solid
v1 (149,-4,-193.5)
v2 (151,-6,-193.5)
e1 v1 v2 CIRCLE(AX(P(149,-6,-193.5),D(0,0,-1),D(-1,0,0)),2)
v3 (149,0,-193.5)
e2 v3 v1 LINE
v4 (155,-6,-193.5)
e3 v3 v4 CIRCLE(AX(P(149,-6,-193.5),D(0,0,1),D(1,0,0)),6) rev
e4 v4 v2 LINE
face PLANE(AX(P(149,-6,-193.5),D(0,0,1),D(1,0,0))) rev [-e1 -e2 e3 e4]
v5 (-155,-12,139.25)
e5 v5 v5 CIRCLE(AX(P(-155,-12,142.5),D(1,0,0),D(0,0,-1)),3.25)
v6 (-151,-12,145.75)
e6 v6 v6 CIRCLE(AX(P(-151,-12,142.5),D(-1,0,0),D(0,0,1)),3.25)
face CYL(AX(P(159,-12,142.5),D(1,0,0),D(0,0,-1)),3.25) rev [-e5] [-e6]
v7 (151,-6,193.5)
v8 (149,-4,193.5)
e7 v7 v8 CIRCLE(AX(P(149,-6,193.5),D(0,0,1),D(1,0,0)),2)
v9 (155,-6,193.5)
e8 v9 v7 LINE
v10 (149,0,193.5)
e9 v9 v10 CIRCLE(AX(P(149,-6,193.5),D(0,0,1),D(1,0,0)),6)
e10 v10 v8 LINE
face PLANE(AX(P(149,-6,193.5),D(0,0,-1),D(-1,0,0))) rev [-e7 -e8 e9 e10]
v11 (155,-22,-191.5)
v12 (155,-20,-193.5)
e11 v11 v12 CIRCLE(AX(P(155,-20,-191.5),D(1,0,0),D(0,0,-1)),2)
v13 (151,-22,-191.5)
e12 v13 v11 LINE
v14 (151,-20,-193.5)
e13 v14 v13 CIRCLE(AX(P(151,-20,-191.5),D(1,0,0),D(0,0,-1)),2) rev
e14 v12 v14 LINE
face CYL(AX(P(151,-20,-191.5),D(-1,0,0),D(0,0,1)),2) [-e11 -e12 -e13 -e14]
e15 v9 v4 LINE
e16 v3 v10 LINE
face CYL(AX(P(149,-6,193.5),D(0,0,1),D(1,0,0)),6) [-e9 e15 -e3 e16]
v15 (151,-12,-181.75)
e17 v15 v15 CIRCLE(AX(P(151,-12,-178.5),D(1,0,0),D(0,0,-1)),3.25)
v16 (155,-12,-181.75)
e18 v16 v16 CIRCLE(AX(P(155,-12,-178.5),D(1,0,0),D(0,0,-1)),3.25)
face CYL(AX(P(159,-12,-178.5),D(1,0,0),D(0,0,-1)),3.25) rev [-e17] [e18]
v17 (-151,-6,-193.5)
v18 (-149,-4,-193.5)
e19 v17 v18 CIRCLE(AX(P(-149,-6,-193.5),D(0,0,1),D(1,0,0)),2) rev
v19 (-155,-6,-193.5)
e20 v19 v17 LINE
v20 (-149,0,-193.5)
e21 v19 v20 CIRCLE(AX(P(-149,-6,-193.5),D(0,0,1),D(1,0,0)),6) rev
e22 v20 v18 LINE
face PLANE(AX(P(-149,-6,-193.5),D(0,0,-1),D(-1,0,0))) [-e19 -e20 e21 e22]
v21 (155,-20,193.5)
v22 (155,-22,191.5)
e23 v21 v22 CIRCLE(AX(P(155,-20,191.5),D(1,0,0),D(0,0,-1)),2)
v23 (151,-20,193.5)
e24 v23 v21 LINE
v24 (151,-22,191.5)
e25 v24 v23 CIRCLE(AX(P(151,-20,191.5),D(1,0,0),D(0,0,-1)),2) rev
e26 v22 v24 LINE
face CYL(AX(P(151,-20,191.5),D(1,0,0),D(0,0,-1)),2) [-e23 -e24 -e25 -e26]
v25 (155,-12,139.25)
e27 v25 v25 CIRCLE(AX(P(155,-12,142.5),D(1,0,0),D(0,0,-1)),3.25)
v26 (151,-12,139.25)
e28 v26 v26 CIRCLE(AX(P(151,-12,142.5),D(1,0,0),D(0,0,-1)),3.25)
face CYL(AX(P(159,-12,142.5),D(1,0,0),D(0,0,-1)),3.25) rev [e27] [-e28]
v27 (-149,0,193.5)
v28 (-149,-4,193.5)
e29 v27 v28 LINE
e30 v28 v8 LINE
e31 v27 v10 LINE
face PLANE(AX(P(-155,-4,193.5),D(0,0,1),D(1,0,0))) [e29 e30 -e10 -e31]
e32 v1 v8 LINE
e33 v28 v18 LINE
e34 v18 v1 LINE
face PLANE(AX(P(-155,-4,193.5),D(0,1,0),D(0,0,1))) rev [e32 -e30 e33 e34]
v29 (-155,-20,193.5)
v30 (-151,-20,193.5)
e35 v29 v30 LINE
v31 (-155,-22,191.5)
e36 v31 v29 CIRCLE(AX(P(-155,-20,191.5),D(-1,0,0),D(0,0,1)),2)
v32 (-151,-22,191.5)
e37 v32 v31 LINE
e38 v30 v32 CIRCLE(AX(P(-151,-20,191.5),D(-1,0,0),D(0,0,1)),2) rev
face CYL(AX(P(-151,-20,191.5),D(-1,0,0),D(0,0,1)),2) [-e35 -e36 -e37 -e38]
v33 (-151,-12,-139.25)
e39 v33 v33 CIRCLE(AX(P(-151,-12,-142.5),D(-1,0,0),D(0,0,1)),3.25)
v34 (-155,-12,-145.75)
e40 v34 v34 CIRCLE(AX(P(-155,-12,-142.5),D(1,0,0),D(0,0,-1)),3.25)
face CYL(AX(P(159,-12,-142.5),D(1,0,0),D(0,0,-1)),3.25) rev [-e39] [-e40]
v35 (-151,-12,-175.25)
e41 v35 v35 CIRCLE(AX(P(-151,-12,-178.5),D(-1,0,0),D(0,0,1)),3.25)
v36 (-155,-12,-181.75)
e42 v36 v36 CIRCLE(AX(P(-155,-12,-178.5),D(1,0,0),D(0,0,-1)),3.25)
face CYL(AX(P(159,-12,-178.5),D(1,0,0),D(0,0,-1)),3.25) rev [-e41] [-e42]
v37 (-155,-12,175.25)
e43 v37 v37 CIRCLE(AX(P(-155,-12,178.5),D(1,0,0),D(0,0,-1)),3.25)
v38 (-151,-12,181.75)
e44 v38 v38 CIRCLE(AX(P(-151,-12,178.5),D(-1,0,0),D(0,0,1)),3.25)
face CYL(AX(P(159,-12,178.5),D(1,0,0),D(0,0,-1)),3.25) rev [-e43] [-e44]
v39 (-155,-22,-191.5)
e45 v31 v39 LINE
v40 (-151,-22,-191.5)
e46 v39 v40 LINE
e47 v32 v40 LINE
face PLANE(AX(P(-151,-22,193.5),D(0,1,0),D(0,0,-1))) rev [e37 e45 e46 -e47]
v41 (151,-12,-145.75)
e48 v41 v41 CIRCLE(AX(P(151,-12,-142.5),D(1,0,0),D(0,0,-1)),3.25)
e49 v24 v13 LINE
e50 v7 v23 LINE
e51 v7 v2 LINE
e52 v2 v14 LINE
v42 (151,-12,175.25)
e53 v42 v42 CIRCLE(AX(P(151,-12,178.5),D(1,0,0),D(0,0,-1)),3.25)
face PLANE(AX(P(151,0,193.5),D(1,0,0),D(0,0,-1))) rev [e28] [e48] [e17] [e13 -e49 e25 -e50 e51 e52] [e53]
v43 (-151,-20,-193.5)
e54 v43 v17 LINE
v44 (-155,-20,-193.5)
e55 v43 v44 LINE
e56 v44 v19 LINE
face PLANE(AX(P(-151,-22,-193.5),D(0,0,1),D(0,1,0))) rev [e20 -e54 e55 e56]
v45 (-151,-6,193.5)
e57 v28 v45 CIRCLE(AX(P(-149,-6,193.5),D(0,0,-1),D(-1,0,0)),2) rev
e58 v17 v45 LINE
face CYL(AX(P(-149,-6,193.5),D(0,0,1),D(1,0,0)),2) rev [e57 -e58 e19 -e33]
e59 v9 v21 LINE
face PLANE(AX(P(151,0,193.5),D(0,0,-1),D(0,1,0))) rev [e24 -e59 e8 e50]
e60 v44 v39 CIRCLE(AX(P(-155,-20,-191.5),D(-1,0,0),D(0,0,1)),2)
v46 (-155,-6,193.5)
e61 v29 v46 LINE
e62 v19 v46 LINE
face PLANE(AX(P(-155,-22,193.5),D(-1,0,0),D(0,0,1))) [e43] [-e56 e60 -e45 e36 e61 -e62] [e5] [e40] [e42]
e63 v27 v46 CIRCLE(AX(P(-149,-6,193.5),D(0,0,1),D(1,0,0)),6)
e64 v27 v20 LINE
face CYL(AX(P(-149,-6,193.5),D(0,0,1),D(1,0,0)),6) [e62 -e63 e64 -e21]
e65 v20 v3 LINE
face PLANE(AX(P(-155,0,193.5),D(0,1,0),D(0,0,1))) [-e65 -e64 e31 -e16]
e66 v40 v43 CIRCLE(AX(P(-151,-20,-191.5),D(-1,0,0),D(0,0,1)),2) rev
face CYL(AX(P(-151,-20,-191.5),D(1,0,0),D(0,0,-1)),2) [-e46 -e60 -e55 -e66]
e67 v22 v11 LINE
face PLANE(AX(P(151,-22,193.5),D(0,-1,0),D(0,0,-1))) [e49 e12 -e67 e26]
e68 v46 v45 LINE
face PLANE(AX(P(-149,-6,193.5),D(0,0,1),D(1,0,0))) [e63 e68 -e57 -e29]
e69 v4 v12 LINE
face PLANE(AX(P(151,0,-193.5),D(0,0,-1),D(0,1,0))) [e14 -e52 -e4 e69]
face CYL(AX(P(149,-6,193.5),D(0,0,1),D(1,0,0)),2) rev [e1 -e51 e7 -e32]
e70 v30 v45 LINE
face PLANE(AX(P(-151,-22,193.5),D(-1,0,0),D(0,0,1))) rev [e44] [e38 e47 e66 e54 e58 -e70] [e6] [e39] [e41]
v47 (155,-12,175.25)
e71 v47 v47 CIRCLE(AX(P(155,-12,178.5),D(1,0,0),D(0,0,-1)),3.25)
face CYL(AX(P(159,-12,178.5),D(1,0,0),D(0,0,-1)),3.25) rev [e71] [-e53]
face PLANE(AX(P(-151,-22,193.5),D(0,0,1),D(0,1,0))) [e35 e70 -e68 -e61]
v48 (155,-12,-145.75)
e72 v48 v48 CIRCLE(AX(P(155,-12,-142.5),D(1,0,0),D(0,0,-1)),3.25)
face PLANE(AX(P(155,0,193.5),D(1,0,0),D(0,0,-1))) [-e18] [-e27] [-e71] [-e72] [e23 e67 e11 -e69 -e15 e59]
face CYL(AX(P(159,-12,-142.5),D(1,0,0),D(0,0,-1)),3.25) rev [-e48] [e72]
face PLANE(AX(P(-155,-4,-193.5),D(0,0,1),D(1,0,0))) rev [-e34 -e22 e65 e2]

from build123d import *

# Parameters (mm, degrees)
EXTRUDE_THIN1_DEPTH        = 193.5
CONVERT_SOLID1_START       = -193.5
CONVERT_SOLID1_DEPTH       = 387
CONVERT_SOLID1_2_DEPTH     = 387
FILLET1_R                  = 2
F_6_5_6_5_DIAMETER_HOLE1_D = 6.5


# Read off the part's stored shape, not the designer's step: Convert-Solid1
with BuildPart() as part:
    # Sketch1 → Extrude-Thin1 (new, symmetric)
    with BuildSketch(Plane.XY):
        Polygon((-155, -22), (-155, 0), (155, 0), (155, -22), (151, -22), (151, -4), (-151, -4), (-151, -22), align=None)
    extrude(amount=EXTRUDE_THIN1_DEPTH, both=True)

    # Convert-Solid1 outline → Convert-Solid1 (cut)
    with BuildSketch(Plane.XY.offset(CONVERT_SOLID1_START)):
        with BuildLine():
            Line((155, 0), (149, 0))
            ThreePointArc((149, 0), (153.242640687, -1.757359313), (155, -6))
            Line((155, -6), (155, 0))
        make_face()
        with BuildLine():
            ThreePointArc((-155, -6), (-153.242640687, -1.757359313), (-149, 0))
            Line((-149, 0), (-155, 0))
            Line((-155, 0), (-155, -6))
        make_face()
    extrude(amount=CONVERT_SOLID1_DEPTH, mode=Mode.SUBTRACT)

    # Convert-Solid1 2 outline → Convert-Solid1 2 (add)
    with BuildSketch(Plane.XY.offset(CONVERT_SOLID1_START)):
        with BuildLine():
            Line((151, -4), (149, -4))
            ThreePointArc((149, -4), (150.414213562, -4.585786438), (151, -6))
            Line((151, -6), (151, -4))
        make_face()
        with BuildLine():
            ThreePointArc((-151, -6), (-150.414213562, -4.585786438), (-149, -4))
            Line((-149, -4), (-151, -4))
            Line((-151, -4), (-151, -6))
        make_face()
    extrude(amount=CONVERT_SOLID1_2_DEPTH)

    # Fillet1
    fillet1_edges = [part.edges().sort_by_distance(p)[0] for p in [
        (153, -22, 193.5),
        (153, -22, -193.5),
        (-153, -22, -193.5),
        (-153, -22, 193.5),
    ]]
    fillet(fillet1_edges, radius=FILLET1_R)

    # Ø6.5 (6.5) Diameter Hole1 (through all)
    with Locations(Plane(origin=(159, 0, 0), x_dir=(0, 0, -1), z_dir=(1, 0, 0))):
        with Locations((-178.5, -12), (-142.5, -12), (142.5, -12), (178.5, -12)):
            Hole(F_6_5_6_5_DIAMETER_HOLE1_D / 2)


solid = part.part
